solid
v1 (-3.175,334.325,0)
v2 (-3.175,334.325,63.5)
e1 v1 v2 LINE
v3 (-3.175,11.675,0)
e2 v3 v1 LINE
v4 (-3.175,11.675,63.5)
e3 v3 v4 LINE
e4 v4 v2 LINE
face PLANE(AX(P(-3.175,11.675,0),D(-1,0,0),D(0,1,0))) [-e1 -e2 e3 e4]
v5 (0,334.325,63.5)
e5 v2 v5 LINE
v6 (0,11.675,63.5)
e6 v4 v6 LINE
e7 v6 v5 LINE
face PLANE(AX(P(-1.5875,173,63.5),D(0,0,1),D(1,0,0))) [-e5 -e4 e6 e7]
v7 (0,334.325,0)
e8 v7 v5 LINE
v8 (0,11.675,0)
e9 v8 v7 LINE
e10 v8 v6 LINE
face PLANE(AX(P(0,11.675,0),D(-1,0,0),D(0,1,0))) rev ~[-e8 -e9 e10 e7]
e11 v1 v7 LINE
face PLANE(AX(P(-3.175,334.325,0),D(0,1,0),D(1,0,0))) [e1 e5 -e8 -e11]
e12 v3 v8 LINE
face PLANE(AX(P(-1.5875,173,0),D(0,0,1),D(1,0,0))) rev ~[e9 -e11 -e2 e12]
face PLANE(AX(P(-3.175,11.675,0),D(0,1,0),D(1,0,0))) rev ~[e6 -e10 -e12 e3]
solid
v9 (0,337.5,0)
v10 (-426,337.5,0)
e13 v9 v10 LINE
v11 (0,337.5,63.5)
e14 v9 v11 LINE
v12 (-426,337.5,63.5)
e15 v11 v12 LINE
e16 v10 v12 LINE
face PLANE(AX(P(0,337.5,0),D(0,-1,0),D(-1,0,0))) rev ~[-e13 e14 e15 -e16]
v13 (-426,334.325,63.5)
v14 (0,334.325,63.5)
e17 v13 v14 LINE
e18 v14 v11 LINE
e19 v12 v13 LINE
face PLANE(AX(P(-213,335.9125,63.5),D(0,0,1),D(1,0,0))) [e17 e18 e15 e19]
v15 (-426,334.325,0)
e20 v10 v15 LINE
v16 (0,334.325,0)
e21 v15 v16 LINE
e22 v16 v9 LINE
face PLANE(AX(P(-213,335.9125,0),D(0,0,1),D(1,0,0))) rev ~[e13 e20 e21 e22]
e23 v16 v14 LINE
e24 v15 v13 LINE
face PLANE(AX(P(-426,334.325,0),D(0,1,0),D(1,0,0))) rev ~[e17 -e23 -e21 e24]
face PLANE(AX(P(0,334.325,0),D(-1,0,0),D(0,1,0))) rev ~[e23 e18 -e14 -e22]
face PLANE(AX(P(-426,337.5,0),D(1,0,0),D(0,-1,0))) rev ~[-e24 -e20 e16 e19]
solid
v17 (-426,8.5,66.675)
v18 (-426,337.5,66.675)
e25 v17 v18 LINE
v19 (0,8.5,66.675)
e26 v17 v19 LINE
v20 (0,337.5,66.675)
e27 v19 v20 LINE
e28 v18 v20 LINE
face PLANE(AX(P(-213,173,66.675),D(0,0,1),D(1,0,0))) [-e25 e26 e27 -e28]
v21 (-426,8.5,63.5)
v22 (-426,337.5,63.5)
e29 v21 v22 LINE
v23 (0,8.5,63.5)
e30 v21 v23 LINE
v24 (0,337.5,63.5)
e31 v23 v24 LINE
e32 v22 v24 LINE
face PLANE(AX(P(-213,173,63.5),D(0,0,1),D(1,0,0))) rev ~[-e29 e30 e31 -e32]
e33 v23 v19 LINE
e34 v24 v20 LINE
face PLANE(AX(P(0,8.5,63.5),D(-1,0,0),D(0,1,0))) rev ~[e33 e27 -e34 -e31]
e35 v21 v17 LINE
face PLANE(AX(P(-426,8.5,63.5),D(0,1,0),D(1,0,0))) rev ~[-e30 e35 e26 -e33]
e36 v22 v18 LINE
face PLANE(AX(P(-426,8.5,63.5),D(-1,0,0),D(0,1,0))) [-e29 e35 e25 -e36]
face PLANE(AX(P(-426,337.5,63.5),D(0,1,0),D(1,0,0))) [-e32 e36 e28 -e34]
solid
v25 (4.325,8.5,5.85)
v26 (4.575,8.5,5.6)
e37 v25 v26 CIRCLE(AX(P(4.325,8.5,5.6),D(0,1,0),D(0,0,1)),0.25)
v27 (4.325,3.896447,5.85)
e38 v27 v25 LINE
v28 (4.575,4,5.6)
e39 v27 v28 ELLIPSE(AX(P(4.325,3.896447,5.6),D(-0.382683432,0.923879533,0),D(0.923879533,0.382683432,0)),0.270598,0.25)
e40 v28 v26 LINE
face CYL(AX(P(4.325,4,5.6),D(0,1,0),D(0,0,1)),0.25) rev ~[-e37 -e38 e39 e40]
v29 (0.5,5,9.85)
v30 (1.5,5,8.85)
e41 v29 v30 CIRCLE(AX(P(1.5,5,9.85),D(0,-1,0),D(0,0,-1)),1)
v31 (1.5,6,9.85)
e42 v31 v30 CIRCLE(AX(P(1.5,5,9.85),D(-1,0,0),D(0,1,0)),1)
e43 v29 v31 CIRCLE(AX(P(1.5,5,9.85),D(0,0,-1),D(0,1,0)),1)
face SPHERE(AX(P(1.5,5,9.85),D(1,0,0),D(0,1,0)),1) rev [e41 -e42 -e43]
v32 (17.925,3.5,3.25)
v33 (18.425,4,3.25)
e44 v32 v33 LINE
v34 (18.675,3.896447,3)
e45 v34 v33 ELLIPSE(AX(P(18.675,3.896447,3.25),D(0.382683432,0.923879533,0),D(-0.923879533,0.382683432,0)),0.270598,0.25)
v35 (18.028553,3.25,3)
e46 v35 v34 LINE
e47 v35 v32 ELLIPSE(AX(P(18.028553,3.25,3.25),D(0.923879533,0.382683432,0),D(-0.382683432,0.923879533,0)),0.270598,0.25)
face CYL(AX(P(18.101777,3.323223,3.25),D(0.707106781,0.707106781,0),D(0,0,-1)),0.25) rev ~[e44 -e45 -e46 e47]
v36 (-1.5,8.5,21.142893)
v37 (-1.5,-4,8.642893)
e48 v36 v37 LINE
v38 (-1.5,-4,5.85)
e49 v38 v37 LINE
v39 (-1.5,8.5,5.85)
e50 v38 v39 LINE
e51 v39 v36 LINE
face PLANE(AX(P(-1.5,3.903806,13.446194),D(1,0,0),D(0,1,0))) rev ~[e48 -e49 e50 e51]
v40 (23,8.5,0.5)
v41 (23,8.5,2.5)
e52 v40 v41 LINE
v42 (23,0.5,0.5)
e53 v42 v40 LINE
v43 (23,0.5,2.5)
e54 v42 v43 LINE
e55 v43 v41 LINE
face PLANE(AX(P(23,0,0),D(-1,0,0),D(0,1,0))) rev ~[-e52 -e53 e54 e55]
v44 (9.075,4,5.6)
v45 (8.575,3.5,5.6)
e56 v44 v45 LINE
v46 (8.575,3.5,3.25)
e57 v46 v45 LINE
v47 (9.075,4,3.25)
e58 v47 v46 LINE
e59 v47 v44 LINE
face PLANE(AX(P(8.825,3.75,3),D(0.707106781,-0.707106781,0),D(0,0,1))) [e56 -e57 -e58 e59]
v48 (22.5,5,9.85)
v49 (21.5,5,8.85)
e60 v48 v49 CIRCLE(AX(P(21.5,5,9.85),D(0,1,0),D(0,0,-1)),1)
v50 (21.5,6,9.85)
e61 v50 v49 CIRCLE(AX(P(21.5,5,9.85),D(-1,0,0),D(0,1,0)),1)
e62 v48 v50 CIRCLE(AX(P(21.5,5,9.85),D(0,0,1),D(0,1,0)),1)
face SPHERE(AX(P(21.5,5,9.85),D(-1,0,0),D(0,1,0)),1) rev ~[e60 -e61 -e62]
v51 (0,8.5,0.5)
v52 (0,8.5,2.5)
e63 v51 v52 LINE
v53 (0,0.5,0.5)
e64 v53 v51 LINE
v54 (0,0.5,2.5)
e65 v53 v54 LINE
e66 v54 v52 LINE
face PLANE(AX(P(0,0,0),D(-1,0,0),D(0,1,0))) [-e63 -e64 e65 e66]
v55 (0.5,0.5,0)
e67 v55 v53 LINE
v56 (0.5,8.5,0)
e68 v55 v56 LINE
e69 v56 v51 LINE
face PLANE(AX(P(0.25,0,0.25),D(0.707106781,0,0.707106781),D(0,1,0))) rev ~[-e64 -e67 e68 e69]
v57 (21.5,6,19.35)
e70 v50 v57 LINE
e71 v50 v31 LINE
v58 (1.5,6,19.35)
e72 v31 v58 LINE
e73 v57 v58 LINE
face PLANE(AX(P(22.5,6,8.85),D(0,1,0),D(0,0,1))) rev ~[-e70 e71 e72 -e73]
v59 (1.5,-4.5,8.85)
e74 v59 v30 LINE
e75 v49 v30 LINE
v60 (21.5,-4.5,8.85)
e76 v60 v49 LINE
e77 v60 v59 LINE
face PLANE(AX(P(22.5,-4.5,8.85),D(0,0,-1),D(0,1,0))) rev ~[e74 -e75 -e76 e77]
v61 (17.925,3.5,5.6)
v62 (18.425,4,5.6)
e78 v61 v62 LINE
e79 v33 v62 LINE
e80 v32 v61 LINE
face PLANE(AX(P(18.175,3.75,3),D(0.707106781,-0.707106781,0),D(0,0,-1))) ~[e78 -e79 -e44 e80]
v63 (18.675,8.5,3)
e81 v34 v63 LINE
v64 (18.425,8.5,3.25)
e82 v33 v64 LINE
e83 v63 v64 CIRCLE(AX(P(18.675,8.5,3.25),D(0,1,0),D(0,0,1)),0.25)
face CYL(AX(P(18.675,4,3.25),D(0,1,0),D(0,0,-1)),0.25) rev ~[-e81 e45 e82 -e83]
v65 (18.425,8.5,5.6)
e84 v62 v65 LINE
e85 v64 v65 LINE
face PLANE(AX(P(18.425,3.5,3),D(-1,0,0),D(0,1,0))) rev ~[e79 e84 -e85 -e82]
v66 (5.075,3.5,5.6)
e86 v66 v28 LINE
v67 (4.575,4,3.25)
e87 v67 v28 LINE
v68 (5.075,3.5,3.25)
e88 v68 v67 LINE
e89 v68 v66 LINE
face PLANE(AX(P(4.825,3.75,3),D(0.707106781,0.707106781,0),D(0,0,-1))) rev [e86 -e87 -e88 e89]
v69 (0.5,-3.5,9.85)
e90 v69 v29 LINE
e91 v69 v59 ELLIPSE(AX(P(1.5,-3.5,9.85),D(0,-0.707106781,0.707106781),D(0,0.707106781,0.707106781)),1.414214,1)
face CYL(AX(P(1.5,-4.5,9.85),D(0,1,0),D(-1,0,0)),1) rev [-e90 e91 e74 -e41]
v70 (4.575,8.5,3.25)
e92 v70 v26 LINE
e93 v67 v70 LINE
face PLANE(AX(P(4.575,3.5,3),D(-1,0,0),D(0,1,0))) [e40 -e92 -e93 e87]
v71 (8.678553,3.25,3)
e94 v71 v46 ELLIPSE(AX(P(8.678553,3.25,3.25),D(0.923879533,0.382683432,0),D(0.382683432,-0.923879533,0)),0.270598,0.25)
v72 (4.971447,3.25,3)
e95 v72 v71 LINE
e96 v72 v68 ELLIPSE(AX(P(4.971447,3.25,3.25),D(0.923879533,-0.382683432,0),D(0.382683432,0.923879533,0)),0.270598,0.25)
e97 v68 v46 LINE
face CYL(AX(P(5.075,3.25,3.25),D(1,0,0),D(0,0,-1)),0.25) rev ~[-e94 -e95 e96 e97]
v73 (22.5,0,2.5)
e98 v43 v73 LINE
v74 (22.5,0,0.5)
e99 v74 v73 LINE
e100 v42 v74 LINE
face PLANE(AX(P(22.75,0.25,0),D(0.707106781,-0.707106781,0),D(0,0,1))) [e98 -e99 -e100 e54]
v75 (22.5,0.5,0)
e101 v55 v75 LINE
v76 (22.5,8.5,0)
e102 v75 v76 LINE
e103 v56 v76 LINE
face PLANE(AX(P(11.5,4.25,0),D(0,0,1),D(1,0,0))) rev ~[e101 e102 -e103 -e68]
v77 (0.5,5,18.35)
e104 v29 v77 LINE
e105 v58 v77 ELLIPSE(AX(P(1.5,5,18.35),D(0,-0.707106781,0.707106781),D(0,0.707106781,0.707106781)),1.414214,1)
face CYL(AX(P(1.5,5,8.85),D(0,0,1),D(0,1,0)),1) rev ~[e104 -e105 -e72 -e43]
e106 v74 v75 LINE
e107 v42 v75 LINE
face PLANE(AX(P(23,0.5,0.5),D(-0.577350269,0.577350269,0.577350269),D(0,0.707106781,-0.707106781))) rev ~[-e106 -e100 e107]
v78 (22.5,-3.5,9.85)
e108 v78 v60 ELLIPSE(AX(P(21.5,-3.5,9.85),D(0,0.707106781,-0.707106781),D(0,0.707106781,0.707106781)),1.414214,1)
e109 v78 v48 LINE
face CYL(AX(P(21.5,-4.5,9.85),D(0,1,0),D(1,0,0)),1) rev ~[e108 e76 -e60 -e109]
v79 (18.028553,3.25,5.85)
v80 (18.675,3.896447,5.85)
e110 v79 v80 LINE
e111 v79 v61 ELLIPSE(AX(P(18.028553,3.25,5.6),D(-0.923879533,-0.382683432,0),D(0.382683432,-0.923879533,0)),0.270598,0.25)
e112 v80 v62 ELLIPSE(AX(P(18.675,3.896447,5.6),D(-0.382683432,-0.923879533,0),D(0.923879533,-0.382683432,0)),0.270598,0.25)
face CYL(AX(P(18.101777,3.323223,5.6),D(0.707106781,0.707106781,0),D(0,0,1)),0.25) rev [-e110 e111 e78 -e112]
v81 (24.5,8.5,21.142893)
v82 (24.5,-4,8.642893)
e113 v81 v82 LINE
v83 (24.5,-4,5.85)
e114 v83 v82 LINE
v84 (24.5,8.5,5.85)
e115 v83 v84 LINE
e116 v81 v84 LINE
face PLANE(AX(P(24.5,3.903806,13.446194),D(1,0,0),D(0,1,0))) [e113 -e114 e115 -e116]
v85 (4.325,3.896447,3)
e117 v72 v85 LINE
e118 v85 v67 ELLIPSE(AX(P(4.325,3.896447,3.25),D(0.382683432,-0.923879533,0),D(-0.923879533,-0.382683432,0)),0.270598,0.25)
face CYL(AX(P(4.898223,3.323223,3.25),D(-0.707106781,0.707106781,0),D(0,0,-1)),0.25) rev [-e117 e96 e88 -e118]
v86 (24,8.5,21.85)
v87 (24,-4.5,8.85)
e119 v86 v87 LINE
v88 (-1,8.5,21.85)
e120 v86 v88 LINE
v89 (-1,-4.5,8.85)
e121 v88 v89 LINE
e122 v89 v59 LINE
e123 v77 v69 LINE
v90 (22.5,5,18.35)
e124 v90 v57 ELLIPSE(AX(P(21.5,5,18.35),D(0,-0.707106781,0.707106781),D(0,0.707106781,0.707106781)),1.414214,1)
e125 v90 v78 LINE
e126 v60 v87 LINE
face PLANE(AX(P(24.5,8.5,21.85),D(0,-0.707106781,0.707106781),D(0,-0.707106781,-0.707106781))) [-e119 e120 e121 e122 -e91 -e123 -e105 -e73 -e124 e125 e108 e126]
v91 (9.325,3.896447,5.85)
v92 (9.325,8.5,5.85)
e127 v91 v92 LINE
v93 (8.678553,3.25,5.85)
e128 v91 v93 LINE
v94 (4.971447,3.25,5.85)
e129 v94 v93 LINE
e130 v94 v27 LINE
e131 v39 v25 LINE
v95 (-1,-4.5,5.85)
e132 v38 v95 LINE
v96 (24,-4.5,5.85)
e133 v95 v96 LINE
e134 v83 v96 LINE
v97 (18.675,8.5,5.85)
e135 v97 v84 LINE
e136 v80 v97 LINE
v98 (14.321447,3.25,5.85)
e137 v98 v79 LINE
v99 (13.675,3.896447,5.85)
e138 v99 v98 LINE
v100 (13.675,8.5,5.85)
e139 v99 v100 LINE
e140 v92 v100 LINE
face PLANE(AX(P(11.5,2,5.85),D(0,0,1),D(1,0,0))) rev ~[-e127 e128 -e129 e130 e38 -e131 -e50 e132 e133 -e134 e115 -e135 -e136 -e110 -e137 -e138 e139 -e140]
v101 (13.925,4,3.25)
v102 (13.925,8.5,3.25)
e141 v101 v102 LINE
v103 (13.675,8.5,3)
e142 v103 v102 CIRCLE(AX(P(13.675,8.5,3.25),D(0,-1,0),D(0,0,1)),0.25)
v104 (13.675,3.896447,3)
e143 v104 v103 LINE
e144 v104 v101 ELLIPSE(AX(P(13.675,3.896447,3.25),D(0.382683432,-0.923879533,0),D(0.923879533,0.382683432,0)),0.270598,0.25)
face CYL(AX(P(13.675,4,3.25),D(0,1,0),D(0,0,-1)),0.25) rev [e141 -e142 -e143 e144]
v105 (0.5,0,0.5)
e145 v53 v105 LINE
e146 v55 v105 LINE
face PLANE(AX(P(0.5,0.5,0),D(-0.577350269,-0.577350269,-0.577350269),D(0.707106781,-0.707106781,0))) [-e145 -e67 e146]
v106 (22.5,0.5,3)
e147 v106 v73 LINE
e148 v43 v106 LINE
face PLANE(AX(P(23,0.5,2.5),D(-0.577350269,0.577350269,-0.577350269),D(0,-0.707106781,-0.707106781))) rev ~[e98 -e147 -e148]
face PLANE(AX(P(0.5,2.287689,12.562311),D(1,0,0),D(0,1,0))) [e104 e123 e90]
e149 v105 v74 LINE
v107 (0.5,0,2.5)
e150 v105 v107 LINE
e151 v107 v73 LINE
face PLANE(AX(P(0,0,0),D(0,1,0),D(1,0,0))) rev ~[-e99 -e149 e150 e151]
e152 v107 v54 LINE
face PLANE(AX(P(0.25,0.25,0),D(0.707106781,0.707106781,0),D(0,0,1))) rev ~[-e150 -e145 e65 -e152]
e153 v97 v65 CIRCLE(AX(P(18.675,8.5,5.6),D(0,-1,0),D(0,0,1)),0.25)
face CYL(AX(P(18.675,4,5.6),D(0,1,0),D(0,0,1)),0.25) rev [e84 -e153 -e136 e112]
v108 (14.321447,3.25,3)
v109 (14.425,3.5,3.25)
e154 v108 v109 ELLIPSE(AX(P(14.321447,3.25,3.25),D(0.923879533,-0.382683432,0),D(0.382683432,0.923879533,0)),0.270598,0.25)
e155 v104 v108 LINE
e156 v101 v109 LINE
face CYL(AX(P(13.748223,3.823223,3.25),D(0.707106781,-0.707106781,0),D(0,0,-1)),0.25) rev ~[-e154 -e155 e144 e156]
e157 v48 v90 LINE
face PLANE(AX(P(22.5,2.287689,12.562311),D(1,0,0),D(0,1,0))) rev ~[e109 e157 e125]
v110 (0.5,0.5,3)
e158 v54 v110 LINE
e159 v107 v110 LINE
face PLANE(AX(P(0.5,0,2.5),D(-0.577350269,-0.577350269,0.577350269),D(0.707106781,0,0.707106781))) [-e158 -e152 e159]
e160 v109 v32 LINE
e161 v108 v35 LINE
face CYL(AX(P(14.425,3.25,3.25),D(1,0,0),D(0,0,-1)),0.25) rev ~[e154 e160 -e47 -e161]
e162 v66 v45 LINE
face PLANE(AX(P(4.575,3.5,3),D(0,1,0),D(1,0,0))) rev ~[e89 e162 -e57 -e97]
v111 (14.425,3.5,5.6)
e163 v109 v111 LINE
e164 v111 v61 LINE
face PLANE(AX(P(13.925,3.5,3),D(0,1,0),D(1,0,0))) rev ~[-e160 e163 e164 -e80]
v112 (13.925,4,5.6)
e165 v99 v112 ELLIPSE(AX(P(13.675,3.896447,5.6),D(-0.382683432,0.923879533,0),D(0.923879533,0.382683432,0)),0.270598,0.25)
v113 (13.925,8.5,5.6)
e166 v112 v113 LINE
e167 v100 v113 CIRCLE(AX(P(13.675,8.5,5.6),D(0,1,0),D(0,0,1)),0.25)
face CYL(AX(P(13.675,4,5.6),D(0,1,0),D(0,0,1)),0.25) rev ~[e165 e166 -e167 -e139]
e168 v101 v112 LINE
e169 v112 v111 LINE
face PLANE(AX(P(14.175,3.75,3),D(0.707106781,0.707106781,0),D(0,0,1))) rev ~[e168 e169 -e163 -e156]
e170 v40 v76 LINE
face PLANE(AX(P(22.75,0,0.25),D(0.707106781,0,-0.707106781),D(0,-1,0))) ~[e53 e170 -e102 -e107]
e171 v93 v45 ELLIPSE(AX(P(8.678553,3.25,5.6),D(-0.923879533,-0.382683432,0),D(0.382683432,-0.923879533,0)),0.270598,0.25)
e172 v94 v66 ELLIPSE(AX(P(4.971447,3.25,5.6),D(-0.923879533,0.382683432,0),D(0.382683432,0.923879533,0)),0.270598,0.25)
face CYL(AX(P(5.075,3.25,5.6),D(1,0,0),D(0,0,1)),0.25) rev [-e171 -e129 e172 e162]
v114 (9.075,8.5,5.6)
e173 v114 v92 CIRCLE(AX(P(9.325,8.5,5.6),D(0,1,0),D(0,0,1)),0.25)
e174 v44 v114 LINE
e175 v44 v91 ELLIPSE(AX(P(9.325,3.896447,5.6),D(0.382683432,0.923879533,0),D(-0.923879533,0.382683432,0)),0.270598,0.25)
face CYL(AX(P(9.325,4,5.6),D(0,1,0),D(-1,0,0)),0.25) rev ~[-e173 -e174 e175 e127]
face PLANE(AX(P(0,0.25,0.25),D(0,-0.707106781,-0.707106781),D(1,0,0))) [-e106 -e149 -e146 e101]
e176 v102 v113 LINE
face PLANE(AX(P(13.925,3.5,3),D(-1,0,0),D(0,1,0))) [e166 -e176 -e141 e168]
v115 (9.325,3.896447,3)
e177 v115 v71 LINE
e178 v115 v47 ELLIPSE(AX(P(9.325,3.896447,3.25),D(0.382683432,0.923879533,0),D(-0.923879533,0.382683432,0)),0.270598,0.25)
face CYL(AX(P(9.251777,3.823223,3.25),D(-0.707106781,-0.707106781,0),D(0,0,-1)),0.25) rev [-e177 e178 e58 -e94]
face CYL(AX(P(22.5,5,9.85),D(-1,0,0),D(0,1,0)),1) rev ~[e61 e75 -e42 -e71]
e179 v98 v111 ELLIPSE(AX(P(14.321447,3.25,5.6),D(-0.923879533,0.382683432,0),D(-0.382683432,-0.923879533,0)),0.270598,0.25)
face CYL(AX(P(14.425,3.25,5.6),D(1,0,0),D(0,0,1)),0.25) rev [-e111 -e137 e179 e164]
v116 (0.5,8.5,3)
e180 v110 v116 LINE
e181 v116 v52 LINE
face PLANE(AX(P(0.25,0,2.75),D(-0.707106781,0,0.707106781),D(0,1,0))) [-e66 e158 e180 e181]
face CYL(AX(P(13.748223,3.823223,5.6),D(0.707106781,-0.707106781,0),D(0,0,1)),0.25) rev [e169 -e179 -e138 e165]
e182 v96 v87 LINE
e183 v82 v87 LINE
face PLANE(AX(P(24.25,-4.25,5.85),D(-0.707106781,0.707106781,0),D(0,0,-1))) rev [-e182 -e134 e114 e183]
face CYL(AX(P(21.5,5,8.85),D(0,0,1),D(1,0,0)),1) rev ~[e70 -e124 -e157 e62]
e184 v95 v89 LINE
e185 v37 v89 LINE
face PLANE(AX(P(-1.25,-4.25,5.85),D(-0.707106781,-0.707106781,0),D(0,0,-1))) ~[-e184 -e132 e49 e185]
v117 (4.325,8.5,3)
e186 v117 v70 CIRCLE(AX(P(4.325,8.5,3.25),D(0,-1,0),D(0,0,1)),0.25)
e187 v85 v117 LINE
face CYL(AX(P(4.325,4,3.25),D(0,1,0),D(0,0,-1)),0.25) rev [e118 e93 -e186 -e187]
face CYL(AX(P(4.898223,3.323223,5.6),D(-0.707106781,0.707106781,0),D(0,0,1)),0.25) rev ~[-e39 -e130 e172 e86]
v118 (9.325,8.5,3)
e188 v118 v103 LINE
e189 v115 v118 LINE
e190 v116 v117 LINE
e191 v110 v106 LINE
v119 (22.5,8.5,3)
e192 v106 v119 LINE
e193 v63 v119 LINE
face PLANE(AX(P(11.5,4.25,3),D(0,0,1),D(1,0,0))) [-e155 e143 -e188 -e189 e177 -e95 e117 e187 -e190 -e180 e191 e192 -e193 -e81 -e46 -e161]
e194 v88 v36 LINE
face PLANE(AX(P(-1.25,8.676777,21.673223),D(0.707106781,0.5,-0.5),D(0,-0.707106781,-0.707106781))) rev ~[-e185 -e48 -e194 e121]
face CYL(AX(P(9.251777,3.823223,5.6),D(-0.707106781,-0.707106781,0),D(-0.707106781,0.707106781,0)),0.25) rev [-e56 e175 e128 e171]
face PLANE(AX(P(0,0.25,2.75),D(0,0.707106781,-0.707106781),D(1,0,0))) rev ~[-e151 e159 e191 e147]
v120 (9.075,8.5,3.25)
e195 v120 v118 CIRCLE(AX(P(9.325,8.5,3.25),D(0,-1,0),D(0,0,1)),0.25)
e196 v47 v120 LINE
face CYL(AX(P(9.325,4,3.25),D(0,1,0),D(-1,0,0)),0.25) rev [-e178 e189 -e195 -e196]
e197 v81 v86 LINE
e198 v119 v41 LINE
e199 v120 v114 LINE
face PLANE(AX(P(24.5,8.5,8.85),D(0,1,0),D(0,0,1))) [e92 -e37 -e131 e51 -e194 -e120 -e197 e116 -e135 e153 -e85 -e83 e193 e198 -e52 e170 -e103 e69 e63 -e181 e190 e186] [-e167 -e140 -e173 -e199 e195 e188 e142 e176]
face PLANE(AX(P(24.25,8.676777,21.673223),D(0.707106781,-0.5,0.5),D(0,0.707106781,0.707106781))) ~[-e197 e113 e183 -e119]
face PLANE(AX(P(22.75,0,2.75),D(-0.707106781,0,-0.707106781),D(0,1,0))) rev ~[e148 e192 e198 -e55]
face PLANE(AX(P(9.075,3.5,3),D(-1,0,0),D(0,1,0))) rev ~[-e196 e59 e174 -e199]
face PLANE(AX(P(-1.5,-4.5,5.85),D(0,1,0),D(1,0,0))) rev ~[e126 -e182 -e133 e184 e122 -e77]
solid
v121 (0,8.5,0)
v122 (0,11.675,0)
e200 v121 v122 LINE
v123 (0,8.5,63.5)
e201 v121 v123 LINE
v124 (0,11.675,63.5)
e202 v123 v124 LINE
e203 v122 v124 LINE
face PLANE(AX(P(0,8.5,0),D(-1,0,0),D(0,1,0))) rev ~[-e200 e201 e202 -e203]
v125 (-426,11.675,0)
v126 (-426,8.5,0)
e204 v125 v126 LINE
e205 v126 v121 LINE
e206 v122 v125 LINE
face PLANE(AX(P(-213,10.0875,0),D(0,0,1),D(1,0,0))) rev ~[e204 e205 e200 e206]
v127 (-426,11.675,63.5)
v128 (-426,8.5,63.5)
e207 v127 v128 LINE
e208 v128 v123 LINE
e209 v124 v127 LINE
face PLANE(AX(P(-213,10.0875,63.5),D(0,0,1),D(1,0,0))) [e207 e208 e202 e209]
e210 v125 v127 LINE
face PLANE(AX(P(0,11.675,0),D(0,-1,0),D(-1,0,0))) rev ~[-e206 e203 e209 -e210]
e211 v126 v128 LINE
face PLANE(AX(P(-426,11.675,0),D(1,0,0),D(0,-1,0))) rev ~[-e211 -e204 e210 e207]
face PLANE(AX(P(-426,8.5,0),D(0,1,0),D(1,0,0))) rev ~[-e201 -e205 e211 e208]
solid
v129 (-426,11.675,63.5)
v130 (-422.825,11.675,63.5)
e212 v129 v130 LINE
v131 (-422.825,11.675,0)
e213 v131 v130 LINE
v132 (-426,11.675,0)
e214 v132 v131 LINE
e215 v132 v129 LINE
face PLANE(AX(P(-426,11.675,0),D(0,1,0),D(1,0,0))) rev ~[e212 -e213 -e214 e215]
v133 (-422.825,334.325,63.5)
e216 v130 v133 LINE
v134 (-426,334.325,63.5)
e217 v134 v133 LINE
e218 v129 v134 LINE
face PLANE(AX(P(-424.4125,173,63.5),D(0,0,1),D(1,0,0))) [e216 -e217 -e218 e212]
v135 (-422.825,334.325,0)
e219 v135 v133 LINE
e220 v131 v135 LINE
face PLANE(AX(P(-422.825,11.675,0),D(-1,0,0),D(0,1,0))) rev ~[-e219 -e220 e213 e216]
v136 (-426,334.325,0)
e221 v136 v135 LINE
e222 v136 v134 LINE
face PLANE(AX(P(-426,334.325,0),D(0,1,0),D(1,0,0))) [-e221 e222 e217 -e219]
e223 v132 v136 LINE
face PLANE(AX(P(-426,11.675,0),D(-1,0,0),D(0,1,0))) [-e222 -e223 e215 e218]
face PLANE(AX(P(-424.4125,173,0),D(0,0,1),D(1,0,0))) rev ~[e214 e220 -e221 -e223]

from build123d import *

# Parameters (mm, degrees)
F0_W      = 23
F0_H      = 8.5
F1_DEPTH  = 3
F2_W      = 4.5
F2_H      = 5
F3_DEPTH  = 2.85
F4_W      = 26
F4_H      = 13
F5_DEPTH  = 3
F7_DEPTH  = 26
F8_SIZE   = 0.5
F9_R      = 0.25
F10_SIZE  = 0.5
F12_DEPTH = 63.5
F11_W     = 3.175
F11_H     = 322.65
F13_DEPTH = 63.5
F14_W     = 426
F14_H     = 329
F15_DEPTH = 3.175
F17_START = -2
F17_DEPTH = 22
F18_SIZE  = 0.5
F19_R     = 1


# Not quite as in the source:
# - a length typed as a fraction of an inch, garbled in the dataset ("3 / 203.2 mm" for 3/8 in), is restored


with BuildPart() as f1:
    # F0 (on Top) → F1 (new body)
    with BuildSketch(Plane.XY):
        with Locations((11.5, 4.25)):
            Rectangle(F0_W, F0_H)
    extrude(amount=F1_DEPTH)

    # F2 (on face) → F3 (join)
    with BuildSketch(Plane.XY.offset(3)):
        with Locations((6.825, 6)):
            Rectangle(F2_W, F2_H)
        with Locations((16.175, 6)):
            Rectangle(F2_W, F2_H)
    extrude(amount=F3_DEPTH)

    # F4 (on face) → F5 (join)
    with BuildSketch(Plane.XY.offset(5.85)):
        with Locations((11.5, 2)):
            Rectangle(F4_W, F4_H)
    extrude(amount=F5_DEPTH)

    # F6 (on face) → F7 (join, through all)
    with BuildSketch(Plane.YZ.offset(24.5)):
        Polygon((-4.5, 8.85), (8.5, 8.85), (8.5, 21.85), align=None)
    extrude(amount=-F7_DEPTH)

    # F8
    f8_edges = [f1.edges().sort_by_distance(p)[0] for p in [
        (4.575, 3.5, 4.425),
        (9.075, 3.5, 4.425),
        (13.925, 3.5, 4.425),
        (18.425, 3.5, 4.425),
    ]]
    chamfer(f8_edges, length=F8_SIZE)

    # F9
    f9_edges = [f1.edges().sort_by_distance(p)[0] for p in [
        (4.575, 6.25, 5.85),
        (4.825, 3.75, 5.85),
        (6.825, 3.5, 5.85),
        (8.825, 3.75, 5.85),
        (9.075, 6.25, 5.85),
        (13.925, 6.25, 5.85),
        (14.175, 3.75, 5.85),
        (16.175, 3.5, 5.85),
        (18.175, 3.75, 5.85),
        (18.425, 6.25, 5.85),
        (18.425, 6.25, 3),
        (18.175, 3.75, 3),
        (16.175, 3.5, 3),
        (14.175, 3.75, 3),
        (13.925, 6.25, 3),
        (6.825, 3.5, 3),
        (4.825, 3.75, 3),
        (4.575, 6.25, 3),
        (8.825, 3.75, 3),
        (9.075, 6.25, 3),
    ]]
    fillet(f9_edges, radius=F9_R)

    # F10
    f10_edges = [f1.edges().sort_by_distance(p)[0] for p in [
        (0, 4.25, 3),
        (0, 0, 1.5),
        (0, 4.25, 0),
        (11.5, 0, 3),
        (11.5, 0, 0),
        (23, 4.25, 3),
        (23, 0, 1.5),
        (23, 4.25, 0),
    ]]
    chamfer(f10_edges, length=F10_SIZE)

    # F16 (on face) → F17 (cut)
    with BuildSketch(Plane.YZ.offset(24.5).offset(F17_START)):
        Polygon((6, 19.35), (-4.5, 8.85), (6, 8.85), align=None)
    extrude(amount=-F17_DEPTH, mode=Mode.SUBTRACT)

    # F18
    f18_edges = [f1.edges().sort_by_distance(p)[0] for p in [
        (24.5, 2, 15.35),
        (24.5, -4.5, 7.35),
        (-1.5, -4.5, 7.35),
        (-1.5, 2, 15.35),
    ]]
    chamfer(f18_edges, length=F18_SIZE)

    # F19
    f19_edges = [f1.edges().sort_by_distance(p)[0] for p in [
        (11.5, 6, 8.85),
        (0.5, 6, 14.1),
        (0.5, 0.75, 8.85),
        (22.5, 6, 14.1),
        (22.5, 0.75, 8.85),
    ]]
    fillet(f19_edges, radius=F19_R)


with BuildPart() as f12:
    # F11 (on Top) → F12 (new body)
    with BuildSketch(Plane.XY):
        Polygon((-426, 8.5), (0, 8.5), (0, 11.675), (-3.175, 11.675), (-422.825, 11.675), (-426, 11.675), align=None)
    extrude(amount=F12_DEPTH)


with BuildPart() as f12b:
    # F11 (on Top) → F12, piece 2 (new body)
    with BuildSketch(Plane.XY):
        Polygon((-3.175, 334.325), (0, 334.325), (0, 337.5), (-426, 337.5), (-426, 334.325), (-422.825, 334.325), align=None)
    extrude(amount=F12_DEPTH)


with BuildPart() as f13:
    # F11 (on Top) → F13 (new body, through all)
    with BuildSketch(Plane.XY):
        with Locations((-1.5875, 173)):
            Rectangle(F11_W, F11_H)
    extrude(amount=F13_DEPTH)


with BuildPart() as f13b:
    # F11 (on Top) → F13, piece 2 (new body, through all)
    with BuildSketch(Plane.XY):
        with Locations((-424.4125, 173)):
            Rectangle(F11_W, F11_H)
    extrude(amount=F13_DEPTH)


with BuildPart() as f15:
    # F14 (on face) → F15 (new body)
    with BuildSketch(Plane.XY.offset(63.5)):
        with Locations((-213, 173)):
            Rectangle(F14_W, F14_H)
    extrude(amount=F15_DEPTH)


solid = Compound([f1.part, f12.part, f12b.part, f13.part, f13b.part, f15.part])
